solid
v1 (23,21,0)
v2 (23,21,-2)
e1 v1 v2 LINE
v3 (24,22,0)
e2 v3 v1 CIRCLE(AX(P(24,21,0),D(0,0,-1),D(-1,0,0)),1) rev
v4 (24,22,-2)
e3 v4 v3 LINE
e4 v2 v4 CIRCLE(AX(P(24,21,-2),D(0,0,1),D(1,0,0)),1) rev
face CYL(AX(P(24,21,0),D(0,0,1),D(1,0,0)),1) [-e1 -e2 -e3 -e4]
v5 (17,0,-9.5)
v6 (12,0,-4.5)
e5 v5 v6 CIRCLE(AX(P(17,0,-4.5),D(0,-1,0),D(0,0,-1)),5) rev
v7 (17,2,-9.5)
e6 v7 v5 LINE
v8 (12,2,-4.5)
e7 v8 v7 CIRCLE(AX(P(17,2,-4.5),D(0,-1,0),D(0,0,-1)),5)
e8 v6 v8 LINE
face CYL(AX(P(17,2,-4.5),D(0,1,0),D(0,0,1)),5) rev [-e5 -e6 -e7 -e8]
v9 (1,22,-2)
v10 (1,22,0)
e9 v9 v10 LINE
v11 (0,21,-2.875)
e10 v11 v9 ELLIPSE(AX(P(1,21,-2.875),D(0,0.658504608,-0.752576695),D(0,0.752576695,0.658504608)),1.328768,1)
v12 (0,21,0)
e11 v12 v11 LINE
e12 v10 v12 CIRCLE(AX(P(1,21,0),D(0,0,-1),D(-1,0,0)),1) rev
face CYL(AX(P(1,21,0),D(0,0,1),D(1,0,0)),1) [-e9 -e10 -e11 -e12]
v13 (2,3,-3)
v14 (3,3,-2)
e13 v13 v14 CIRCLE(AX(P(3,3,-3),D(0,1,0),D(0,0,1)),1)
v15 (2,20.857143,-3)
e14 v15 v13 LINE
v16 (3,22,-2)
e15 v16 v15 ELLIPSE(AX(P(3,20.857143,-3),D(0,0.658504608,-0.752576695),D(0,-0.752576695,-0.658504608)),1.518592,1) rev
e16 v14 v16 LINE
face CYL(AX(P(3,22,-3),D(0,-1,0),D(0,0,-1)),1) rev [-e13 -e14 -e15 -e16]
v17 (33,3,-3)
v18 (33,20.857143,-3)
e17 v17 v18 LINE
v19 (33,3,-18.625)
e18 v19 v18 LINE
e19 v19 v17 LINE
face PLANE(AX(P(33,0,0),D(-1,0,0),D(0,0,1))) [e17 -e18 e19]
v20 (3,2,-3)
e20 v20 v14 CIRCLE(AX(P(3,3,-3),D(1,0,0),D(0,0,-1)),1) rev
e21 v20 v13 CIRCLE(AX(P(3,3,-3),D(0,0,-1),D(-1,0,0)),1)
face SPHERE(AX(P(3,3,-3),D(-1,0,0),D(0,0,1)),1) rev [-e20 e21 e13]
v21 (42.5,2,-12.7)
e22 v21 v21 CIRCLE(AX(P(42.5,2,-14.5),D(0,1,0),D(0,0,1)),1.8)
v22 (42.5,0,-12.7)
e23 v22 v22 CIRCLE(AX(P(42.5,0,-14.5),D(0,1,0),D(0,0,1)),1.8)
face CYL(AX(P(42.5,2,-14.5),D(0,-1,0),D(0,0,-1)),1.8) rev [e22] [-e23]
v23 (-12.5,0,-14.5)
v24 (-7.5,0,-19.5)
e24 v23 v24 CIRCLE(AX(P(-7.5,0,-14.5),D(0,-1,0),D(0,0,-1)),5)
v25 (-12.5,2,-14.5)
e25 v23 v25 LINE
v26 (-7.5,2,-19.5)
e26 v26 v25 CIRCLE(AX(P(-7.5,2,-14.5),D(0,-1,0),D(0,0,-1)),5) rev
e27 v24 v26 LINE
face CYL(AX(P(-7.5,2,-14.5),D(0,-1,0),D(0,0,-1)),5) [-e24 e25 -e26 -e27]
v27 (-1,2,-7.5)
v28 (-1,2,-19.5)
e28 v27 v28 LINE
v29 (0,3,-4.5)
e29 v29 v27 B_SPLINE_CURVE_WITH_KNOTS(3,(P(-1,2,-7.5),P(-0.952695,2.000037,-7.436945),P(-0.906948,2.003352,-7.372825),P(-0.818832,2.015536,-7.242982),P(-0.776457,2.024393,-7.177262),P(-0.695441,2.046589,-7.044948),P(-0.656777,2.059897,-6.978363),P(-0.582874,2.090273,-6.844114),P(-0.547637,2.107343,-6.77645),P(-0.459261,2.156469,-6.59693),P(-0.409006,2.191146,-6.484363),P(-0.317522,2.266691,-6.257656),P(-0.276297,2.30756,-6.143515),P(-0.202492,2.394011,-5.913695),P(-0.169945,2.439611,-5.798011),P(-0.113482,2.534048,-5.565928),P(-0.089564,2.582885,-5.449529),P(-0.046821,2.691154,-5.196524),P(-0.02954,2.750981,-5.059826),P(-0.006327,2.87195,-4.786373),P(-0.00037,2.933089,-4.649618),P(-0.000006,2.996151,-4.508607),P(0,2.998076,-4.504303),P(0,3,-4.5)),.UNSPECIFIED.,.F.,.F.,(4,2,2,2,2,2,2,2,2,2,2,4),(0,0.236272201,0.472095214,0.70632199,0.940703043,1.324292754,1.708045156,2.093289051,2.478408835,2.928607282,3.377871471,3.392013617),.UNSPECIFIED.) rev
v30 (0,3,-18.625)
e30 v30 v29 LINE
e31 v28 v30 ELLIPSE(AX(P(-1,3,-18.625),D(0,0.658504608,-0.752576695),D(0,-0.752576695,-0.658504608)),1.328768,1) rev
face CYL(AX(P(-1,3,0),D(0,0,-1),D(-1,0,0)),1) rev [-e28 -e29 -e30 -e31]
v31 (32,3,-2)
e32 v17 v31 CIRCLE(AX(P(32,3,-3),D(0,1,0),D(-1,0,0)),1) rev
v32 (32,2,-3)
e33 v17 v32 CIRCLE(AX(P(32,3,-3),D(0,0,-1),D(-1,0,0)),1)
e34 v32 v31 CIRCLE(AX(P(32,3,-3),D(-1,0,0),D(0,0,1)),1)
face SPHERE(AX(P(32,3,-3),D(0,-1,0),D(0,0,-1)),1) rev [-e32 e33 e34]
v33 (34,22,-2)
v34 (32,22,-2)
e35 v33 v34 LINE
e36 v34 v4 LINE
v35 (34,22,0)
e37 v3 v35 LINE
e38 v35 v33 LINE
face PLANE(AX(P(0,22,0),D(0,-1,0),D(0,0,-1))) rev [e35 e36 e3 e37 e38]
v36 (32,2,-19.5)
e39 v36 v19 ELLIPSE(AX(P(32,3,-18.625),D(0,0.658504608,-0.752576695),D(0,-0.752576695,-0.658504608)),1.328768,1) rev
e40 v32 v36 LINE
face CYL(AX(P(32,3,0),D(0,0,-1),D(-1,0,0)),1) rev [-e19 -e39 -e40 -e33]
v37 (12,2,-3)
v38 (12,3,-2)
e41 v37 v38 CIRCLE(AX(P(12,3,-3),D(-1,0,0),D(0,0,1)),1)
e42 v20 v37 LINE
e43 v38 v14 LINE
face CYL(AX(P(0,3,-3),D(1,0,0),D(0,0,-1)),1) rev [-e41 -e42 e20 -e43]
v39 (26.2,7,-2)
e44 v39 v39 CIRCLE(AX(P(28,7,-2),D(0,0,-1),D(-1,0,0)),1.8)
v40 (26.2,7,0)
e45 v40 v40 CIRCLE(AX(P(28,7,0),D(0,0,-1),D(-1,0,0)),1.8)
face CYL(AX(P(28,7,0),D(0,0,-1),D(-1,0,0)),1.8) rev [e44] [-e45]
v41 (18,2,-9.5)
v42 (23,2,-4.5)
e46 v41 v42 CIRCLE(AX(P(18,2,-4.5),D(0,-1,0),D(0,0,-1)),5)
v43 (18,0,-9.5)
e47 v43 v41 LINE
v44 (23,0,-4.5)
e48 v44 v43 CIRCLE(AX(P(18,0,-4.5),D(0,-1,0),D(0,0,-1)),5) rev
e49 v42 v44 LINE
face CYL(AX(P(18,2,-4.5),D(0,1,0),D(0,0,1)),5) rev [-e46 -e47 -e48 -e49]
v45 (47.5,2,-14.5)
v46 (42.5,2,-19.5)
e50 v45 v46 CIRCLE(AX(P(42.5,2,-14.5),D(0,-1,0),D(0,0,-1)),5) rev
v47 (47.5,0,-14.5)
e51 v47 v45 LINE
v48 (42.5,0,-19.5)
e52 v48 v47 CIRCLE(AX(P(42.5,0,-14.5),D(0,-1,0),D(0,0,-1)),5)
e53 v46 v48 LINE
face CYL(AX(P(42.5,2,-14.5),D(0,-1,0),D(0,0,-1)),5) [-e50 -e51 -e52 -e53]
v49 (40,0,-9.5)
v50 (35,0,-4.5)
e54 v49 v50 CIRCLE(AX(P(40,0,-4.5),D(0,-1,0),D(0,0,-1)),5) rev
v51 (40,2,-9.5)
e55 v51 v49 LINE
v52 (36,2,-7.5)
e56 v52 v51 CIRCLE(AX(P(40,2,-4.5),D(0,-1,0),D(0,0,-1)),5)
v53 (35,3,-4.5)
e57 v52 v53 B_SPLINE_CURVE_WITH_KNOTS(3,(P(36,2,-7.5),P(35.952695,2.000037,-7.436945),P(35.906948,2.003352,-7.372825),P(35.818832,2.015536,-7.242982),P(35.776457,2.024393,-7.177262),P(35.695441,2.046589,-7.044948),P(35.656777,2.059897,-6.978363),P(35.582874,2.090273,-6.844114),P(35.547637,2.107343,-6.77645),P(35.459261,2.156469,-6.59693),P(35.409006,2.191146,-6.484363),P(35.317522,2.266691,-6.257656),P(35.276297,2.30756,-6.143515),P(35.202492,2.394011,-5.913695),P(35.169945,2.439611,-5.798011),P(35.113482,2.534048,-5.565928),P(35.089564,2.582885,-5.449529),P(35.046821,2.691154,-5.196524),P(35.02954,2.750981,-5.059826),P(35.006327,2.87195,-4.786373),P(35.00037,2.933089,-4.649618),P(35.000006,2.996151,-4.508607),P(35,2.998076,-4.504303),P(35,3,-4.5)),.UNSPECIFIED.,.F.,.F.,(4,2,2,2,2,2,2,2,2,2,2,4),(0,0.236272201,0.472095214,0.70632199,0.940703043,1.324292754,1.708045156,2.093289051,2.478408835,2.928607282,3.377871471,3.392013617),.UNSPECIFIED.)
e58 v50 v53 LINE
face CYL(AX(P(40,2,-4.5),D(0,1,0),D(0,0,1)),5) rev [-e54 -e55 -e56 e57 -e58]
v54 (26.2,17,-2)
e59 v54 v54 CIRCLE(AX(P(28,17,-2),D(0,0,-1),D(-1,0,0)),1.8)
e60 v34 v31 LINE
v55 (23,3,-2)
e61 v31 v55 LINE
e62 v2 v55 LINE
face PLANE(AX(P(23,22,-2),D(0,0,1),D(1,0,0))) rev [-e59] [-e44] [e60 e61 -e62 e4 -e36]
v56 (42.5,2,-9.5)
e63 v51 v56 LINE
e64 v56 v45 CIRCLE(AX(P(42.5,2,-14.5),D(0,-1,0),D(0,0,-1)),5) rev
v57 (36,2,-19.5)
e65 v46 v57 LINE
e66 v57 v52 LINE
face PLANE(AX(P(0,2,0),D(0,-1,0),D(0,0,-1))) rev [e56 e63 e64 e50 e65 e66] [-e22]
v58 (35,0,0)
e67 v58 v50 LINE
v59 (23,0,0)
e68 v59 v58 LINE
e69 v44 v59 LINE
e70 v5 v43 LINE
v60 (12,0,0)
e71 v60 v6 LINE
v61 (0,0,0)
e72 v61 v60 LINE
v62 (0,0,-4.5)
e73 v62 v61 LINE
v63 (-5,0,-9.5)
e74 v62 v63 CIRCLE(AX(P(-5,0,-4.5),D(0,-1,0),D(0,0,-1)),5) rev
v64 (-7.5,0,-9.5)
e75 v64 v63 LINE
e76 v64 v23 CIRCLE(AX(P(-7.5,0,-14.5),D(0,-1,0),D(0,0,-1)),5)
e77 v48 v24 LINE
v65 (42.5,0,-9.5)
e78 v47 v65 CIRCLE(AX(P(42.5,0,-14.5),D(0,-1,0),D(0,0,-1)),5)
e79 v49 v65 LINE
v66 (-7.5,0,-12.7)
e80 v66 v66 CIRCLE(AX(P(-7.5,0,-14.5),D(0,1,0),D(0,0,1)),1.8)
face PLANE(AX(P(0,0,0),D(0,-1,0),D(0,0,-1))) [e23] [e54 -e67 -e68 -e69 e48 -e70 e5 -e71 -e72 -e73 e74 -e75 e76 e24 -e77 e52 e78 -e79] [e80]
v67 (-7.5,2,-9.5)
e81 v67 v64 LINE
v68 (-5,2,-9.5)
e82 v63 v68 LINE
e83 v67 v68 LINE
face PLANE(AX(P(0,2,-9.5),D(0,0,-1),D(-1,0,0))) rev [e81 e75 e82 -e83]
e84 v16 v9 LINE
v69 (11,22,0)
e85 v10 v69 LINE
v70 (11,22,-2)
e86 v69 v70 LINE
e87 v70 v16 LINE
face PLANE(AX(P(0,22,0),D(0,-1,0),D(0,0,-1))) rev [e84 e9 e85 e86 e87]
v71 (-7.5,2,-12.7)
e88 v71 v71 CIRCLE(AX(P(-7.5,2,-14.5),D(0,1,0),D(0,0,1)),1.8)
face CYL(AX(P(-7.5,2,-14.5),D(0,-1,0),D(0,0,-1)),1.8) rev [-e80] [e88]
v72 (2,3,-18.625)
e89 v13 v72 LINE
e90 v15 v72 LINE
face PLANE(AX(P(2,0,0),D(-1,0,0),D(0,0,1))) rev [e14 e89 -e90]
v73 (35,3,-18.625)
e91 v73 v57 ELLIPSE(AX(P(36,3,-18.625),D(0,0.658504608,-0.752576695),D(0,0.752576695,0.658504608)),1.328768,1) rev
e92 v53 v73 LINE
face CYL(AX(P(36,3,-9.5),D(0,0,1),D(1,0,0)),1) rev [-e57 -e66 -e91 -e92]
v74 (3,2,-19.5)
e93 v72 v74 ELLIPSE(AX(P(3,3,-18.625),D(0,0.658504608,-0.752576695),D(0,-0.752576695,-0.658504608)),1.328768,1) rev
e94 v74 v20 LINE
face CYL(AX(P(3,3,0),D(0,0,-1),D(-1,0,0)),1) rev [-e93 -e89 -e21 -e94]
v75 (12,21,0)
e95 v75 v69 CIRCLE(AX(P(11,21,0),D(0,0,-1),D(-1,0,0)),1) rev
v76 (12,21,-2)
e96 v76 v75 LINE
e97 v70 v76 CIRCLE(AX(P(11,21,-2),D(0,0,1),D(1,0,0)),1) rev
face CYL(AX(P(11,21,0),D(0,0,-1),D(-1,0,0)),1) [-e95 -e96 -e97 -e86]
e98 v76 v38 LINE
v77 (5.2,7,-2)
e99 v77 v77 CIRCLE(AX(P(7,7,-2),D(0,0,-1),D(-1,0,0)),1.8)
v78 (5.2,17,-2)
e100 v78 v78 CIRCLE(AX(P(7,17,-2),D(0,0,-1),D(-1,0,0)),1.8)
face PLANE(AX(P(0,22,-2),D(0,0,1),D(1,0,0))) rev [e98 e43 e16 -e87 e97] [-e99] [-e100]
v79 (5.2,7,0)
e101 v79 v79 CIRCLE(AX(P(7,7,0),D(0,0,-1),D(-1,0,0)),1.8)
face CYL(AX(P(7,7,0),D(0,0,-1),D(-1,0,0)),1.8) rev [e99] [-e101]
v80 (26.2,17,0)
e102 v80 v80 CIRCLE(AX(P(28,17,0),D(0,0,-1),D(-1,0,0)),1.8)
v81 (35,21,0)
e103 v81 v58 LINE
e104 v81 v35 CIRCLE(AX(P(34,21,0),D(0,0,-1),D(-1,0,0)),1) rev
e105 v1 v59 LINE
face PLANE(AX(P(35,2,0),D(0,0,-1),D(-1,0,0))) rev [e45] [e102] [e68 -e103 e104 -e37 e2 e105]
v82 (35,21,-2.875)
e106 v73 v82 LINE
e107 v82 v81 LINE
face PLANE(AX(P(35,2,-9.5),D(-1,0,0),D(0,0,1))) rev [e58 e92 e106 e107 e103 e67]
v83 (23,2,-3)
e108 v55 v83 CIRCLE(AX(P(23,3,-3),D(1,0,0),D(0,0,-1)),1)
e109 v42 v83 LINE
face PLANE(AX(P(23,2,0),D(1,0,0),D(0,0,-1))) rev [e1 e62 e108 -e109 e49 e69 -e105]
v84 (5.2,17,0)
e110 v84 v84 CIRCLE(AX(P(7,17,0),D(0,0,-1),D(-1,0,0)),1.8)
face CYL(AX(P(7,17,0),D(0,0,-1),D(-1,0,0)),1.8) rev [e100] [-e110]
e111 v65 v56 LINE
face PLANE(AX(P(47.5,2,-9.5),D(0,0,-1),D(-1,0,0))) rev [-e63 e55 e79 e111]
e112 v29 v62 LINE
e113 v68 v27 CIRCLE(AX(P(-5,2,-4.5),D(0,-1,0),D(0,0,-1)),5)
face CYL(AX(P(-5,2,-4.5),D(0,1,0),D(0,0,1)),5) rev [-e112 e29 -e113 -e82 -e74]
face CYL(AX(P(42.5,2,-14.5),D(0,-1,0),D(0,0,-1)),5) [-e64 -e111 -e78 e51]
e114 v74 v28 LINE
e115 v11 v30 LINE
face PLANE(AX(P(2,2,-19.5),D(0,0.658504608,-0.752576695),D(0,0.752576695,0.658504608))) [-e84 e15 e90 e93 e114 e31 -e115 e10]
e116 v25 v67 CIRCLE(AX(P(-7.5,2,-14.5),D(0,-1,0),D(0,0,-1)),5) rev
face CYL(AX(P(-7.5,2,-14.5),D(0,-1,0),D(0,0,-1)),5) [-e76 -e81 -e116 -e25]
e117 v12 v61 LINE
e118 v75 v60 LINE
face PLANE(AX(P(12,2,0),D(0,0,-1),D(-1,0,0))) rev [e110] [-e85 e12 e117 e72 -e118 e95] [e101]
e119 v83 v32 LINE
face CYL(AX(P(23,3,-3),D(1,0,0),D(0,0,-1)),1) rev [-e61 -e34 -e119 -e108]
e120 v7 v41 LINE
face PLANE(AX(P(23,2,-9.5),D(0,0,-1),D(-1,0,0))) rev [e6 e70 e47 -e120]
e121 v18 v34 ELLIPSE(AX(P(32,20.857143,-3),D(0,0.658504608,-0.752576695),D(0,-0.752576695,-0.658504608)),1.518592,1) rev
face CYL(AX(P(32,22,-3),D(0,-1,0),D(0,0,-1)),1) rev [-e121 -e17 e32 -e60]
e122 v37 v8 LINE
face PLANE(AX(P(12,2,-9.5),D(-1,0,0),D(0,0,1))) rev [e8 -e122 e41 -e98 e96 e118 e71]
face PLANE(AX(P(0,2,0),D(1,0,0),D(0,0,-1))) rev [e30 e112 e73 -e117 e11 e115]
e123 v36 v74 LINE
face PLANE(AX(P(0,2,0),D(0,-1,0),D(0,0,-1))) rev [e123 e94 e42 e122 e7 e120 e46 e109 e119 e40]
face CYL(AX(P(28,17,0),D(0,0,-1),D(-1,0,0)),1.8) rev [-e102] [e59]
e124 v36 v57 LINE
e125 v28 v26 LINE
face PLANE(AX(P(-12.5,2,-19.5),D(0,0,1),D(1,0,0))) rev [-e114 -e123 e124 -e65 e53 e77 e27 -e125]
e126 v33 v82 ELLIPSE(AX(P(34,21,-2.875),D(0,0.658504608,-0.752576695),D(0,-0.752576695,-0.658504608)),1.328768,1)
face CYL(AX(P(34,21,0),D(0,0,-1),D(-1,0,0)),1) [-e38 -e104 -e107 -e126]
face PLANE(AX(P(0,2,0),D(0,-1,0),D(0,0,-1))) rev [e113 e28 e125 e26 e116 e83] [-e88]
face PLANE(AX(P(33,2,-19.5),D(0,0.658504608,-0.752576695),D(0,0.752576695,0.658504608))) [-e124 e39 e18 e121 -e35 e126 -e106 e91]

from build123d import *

# Parameters (mm, degrees)
SKETCH1_R           = 1.8
BOSS_EXTRUDE1_DEPTH = 2
SKETCH2_W           = 12
SKETCH2_H           = 2
BOSS_EXTRUDE2_DEPTH = 20
SKETCH3_R           = 1.8
CUT_EXTRUDE1_DEPTH  = 56.195108479
BOSS_EXTRUDE3_DEPTH = 2
BOSS_EXTRUDE4_DEPTH = 2
FILLET1_R           = 5
FILLET2_R           = 5
FILLET3_R           = 1
FILLET4_R           = 1


with BuildPart() as part:
    # Sketch1 → Boss-Extrude1 (new body)
    with BuildSketch(Plane(origin=(0, 0, 0), x_dir=(1, 0, 0), z_dir=(0, 1, 0))):
        Polygon((-12.5, 19.5), (47.5, 19.5), (47.5, 9.5), (35, 9.5), (35, 0), (23, 0), (23, 9.5), (12, 9.5), (12, 0), (0, 0), (0, 9.5), (-12.5, 9.5), align=None)
        with Locations(Location((-7.5, 14.5, 0), (0, 0, 270))):
            Circle(SKETCH1_R, mode=Mode.SUBTRACT)
        with Locations(Location((42.5, 14.5, 0), (0, 0, 270))):
            Circle(SKETCH1_R, mode=Mode.SUBTRACT)
    extrude(amount=BOSS_EXTRUDE1_DEPTH)

    # Sketch2 → Boss-Extrude2 (add)
    with BuildSketch(Plane(origin=(0, 2, 0), x_dir=(1, 0, 0), z_dir=(0, 1, 0))):
        with Locations((29, 1)):
            Rectangle(SKETCH2_W, SKETCH2_H)
        with Locations((6, 1)):
            Rectangle(SKETCH2_W, SKETCH2_H)
    extrude(amount=BOSS_EXTRUDE2_DEPTH)

    # Sketch3 → Cut-Extrude1 (cut, through all)
    with BuildSketch(Plane(origin=(0, 0, -2), x_dir=(-1, 0, 0), z_dir=(0, 0, -1))):
        with Locations((-7, 7)):
            Circle(SKETCH3_R)
        with Locations((-7, 17)):
            Circle(SKETCH3_R)
        with Locations((-28, 7)):
            Circle(SKETCH3_R)
        with Locations((-28, 17)):
            Circle(SKETCH3_R)
    extrude(amount=-CUT_EXTRUDE1_DEPTH, mode=Mode.SUBTRACT)

    # Sketch4 → Boss-Extrude3 (add)
    with BuildSketch(Plane.ZY):
        Polygon((-2, 22), (-2, 2), (-19.5, 2), align=None)
    extrude(amount=-BOSS_EXTRUDE3_DEPTH)

    # Sketch5 → Boss-Extrude4 (add)
    with BuildSketch(Plane(origin=(35, 0, 0), x_dir=(0, 0, -1), z_dir=(1, 0, 0))):
        Polygon((2, 22), (2, 2), (19.5, 2), align=None)
    extrude(amount=-BOSS_EXTRUDE4_DEPTH)

    # Fillet1
    fillet1_edges = [part.edges().sort_by_distance(p)[0] for p in [
        (35, 1, -9.5),
        (23, 1, -9.5),
        (12, 1, -9.5),
        (0, 1, -9.5),
    ]]
    fillet(fillet1_edges, radius=FILLET1_R)

    # Fillet2
    fillet2_edges = [part.edges().sort_by_distance(p)[0] for p in [
        (47.5, 1, -9.5),
        (47.5, 1, -19.5),
        (-12.5, 1, -19.5),
        (-12.5, 1, -9.5),
    ]]
    fillet(fillet2_edges, radius=FILLET2_R - 0.0001)  # a hair under: the kernel refuses the full size

    # Fillet3
    fillet3_edges = [part.edges().sort_by_distance(p)[0] for p in [
        (33, 2, -10.75),
        (33, 12, -2),
        (35, 2, -12),
        (7, 2, -2),
        (2, 12, -2),
        (2, 2, -10.75),
        (0, 2, -12),
        (28, 2, -2),
    ]]
    fillet(fillet3_edges, radius=FILLET3_R)

    # Fillet4
    fillet4_edges = [part.edges().sort_by_distance(p)[0] for p in [
        (0, 22, -1),
        (12, 22, -1),
        (23, 22, -1),
        (35, 22, -1),
    ]]
    fillet(fillet4_edges, radius=FILLET4_R)


solid = part.part
